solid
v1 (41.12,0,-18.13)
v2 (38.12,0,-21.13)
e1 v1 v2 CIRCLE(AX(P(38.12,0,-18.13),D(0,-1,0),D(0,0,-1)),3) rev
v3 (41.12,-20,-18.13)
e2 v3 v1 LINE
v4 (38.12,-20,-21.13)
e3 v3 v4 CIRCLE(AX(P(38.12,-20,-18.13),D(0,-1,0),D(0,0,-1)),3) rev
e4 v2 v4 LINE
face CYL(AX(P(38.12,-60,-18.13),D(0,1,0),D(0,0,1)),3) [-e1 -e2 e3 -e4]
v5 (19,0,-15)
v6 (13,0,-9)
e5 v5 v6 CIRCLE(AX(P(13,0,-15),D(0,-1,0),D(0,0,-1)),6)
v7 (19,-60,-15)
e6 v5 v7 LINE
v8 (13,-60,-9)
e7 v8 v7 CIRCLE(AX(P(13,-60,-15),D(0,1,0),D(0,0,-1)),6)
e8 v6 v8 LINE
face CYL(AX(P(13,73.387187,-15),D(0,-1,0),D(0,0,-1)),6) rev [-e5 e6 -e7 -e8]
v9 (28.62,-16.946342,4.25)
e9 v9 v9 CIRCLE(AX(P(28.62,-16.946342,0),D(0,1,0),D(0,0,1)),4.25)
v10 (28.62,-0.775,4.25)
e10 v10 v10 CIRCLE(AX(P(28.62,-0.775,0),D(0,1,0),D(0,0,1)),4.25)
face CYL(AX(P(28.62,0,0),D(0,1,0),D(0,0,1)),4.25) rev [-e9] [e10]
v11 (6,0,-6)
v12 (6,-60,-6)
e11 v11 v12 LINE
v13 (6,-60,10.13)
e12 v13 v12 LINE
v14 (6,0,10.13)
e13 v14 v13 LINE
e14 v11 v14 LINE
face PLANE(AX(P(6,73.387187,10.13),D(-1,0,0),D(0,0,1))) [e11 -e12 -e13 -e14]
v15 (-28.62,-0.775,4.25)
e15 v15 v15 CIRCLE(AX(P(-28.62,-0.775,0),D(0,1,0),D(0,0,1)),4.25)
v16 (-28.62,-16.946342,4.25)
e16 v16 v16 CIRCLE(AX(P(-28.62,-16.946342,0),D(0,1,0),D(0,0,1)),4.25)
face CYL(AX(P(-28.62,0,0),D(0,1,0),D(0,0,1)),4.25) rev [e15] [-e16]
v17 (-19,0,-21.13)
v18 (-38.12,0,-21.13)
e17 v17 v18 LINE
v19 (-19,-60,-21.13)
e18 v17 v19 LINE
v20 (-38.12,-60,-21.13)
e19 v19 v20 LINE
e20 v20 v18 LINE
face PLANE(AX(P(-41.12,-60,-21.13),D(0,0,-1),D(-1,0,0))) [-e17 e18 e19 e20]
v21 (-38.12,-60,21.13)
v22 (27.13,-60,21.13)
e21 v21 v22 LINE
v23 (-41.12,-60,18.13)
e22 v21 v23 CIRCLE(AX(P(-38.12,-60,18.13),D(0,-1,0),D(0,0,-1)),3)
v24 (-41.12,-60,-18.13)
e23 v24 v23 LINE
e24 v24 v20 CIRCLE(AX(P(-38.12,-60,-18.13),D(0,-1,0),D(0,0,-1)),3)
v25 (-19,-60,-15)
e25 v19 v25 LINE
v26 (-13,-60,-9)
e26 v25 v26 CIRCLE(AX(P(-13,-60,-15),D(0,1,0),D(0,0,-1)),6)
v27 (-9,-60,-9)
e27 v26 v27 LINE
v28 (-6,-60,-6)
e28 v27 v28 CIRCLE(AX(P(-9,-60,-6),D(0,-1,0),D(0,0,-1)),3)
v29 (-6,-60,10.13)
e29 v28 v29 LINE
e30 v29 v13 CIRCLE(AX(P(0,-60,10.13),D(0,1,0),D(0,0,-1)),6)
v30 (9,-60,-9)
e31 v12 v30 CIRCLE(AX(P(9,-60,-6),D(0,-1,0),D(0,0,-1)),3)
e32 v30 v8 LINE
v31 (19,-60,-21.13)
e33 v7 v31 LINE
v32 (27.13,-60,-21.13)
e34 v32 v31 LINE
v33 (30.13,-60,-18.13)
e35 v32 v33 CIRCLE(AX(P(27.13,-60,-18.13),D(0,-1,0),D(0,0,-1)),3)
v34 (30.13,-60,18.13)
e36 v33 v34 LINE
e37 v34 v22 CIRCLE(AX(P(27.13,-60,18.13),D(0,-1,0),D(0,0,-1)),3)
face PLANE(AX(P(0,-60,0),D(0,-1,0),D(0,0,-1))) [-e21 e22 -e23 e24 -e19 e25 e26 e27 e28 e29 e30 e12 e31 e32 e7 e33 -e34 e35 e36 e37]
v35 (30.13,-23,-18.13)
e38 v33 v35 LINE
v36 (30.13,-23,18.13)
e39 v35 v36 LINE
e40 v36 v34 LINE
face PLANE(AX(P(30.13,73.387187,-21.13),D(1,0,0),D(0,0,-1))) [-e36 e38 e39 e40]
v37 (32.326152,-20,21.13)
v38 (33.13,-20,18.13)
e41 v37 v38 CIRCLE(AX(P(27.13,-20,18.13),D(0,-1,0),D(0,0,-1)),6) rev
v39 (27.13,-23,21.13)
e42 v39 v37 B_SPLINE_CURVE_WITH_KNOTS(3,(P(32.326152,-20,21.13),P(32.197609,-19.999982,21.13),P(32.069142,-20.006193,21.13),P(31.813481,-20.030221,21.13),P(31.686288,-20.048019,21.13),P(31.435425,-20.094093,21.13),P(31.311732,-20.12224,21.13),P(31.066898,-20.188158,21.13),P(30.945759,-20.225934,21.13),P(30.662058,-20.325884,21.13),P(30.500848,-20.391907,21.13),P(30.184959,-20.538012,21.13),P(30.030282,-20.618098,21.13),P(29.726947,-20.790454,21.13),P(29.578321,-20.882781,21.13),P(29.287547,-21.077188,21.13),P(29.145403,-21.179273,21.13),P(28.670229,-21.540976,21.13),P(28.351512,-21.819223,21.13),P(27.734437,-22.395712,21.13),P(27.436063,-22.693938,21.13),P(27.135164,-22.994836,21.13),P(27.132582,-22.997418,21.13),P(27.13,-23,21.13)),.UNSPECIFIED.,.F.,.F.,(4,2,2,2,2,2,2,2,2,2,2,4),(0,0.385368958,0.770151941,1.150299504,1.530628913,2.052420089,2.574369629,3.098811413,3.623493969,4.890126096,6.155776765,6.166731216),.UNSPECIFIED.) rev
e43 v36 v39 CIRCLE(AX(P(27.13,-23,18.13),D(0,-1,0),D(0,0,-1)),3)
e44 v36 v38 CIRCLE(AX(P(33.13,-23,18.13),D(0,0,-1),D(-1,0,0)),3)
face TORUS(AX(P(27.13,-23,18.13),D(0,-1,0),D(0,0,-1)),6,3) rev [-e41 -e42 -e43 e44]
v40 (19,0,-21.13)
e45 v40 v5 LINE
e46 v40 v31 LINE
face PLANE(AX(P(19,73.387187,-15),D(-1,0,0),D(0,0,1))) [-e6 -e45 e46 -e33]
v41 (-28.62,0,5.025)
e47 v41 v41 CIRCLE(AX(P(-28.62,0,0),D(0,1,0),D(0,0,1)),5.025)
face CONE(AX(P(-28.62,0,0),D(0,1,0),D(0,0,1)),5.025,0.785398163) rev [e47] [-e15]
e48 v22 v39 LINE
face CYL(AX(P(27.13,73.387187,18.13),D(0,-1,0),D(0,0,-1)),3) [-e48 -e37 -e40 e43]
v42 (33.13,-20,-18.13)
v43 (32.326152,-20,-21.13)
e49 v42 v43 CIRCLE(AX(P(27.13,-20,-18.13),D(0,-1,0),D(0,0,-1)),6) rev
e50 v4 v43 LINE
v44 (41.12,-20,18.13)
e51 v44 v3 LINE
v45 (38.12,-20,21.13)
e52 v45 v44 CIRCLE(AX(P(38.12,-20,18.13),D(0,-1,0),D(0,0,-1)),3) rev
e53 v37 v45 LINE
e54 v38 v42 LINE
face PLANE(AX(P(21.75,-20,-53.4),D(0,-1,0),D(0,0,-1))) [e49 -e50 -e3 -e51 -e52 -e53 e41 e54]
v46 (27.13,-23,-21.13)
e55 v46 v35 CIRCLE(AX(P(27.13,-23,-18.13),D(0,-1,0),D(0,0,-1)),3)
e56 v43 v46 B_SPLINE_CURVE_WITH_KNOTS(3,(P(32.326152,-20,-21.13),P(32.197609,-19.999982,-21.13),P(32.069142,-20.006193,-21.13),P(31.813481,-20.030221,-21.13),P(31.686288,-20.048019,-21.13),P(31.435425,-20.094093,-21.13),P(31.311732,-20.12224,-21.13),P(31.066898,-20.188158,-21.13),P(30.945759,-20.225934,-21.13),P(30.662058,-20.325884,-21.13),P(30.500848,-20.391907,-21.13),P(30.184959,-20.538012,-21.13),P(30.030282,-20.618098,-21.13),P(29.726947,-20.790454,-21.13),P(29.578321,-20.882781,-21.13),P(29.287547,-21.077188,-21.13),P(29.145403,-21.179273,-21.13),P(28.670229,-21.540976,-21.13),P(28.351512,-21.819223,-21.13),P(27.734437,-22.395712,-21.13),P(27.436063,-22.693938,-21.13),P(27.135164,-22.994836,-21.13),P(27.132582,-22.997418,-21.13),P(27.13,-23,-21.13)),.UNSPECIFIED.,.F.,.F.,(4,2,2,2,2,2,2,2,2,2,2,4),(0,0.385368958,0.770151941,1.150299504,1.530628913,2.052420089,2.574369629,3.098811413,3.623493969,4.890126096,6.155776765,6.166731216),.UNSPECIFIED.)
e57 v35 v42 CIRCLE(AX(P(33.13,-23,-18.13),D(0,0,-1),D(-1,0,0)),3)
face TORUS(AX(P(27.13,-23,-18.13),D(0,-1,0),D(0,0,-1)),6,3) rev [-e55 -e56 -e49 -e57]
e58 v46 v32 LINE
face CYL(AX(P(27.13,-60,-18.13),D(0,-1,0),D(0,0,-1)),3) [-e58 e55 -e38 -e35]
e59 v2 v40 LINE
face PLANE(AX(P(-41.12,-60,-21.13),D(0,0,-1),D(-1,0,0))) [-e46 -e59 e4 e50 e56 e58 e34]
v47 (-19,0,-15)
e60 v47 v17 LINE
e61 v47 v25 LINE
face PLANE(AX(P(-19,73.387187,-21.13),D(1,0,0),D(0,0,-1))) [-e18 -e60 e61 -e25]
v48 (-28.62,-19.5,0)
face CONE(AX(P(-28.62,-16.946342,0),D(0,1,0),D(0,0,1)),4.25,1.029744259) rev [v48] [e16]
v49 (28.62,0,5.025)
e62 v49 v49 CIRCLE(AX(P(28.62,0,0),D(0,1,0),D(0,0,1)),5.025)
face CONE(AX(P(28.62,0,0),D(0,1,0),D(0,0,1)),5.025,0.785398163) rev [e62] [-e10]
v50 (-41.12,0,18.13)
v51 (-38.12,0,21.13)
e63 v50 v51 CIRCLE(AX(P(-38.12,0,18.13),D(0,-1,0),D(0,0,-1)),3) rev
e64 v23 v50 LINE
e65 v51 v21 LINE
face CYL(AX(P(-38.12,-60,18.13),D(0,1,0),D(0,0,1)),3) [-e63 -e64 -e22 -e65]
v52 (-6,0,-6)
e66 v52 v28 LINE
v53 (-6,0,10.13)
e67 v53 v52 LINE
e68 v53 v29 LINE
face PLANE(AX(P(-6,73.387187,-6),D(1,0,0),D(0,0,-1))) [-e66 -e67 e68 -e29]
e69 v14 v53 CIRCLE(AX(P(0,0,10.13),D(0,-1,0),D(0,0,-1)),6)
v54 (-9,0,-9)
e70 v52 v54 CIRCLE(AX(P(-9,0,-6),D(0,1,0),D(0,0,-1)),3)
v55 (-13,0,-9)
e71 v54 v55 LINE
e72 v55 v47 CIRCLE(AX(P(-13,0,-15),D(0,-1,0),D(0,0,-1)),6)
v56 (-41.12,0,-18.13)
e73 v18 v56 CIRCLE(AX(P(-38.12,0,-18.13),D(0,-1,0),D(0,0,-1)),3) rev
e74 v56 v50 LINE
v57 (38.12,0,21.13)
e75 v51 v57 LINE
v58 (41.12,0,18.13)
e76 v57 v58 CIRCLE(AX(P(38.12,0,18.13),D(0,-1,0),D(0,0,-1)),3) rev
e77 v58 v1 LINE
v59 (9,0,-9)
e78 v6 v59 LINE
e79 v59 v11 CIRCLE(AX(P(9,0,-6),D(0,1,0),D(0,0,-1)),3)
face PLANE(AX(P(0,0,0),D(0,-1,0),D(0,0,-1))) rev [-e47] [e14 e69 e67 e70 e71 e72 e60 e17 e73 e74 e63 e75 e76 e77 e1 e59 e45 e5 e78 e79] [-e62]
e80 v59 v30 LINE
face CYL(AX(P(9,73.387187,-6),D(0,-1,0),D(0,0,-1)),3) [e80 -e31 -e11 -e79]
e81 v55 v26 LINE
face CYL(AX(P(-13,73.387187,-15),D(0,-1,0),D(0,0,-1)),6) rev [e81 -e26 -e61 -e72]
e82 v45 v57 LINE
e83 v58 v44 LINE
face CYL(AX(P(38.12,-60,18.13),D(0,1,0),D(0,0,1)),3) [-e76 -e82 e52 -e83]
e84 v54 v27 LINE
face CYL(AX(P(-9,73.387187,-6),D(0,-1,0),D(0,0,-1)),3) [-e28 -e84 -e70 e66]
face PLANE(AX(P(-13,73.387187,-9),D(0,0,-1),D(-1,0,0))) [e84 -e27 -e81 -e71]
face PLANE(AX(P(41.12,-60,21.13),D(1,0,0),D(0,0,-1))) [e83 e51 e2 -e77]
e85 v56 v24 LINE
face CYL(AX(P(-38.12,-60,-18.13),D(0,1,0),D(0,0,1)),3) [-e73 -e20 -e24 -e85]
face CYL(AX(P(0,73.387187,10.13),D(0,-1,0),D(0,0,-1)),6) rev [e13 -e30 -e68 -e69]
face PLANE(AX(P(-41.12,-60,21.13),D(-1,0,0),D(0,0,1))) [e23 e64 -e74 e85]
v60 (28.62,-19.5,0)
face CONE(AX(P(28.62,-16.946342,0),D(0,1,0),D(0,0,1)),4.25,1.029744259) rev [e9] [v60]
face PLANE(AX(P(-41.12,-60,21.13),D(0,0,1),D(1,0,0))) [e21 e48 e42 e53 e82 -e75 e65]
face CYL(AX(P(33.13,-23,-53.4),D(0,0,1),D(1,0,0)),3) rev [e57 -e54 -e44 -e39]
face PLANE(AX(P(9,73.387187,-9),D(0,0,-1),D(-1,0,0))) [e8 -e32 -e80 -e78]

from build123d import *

# Parameters (mm, degrees)
SKETCH2_W                    = 82.24
SKETCH2_H                    = 42.26
BOSS_EXTRUDE1_DEPTH          = 60
FILLET1_R                    = 3
SKETCH5_OUTSIDE_W            = 106.284
SKETCH5_OUTSIDE_H            = 66.304
CUT_EXTRUDE2_DEPTH           = 40
CUT_EXTRUDE3_DEPTH           = 76.745173444
FILLET2_R                    = 3
FILLET3_R                    = 3
M10_TAPPED_HOLE1_D           = 8.5
M10_TAPPED_HOLE1_DEPTH       = 16.946342369
M10_TAPPED_HOLE1_CSINK_D     = 10.05
M10_TAPPED_HOLE1_CSINK_ANGLE = 90
M10_TAPPED_HOLE1_TIP         = 2.553657631


with BuildPart() as part:
    # Sketch2 → Boss-Extrude1 (new body)
    with BuildSketch(Plane(origin=(0, 0, 0), x_dir=(1, 0, 0), z_dir=(0, 1, 0))):
        Rectangle(SKETCH2_W, SKETCH2_H)
    extrude(amount=-BOSS_EXTRUDE1_DEPTH)

    # Fillet1
    fillet1_edges = [part.edges().sort_by_distance(p)[0] for p in [
        (41.12, -30, 21.13),
        (-41.12, -30, 21.13),
        (-41.12, -30, -21.13),
        (41.12, -30, -21.13),
    ]]
    fillet(fillet1_edges, radius=FILLET1_R)

    # Sketch5 outside → Cut-Extrude2 (cut)
    with BuildSketch(Plane.XZ.offset(60)):
        Rectangle(SKETCH5_OUTSIDE_W, SKETCH5_OUTSIDE_H)
        with BuildLine():
            Line((19, -21.13), (30.13, -21.13))
            Line((30.13, -21.13), (30.13, 21.13))
            Line((30.13, 21.13), (-41.12, 21.13))
            Line((-41.12, 21.13), (-41.12, -21.13))
            Line((-41.12, -21.13), (-19, -21.13))
            Line((-19, -21.13), (-19, -15))
            ThreePointArc((-19, -15), (-17.242640687, -10.757359313), (-13, -9))
            Line((-13, -9), (-9, -9))
            ThreePointArc((-9, -9), (-6.878679656, -8.121320344), (-6, -6))
            Line((-6, -6), (-6, 10.13))
            ThreePointArc((-6, 10.13), (0, 16.13), (6, 10.13))
            Line((6, 10.13), (6, -6))
            ThreePointArc((6, -6), (6.878679656, -8.121320344), (9, -9))
            Line((9, -9), (13, -9))
            ThreePointArc((13, -9), (17.242640687, -10.757359313), (19, -15))
            Line((19, -15), (19, -21.13))
        make_face(mode=Mode.SUBTRACT)
    extrude(amount=-CUT_EXTRUDE2_DEPTH, mode=Mode.SUBTRACT)

    # Sketch6 → Cut-Extrude3 (cut, through all)
    with BuildSketch(Plane.XZ.offset(60)):
        with BuildLine():
            Line((-13, -9), (-9, -9))
            ThreePointArc((-9, -9), (-6.878679656, -8.121320344), (-6, -6))
            Line((-6, -6), (-6, 10.13))
            ThreePointArc((-6, 10.13), (0, 16.13), (6, 10.13))
            Line((6, 10.13), (6, -6))
            ThreePointArc((6, -6), (6.878679656, -8.121320344), (9, -9))
            Line((9, -9), (13, -9))
            ThreePointArc((13, -9), (17.242640687, -10.757359313), (19, -15))
            Line((19, -15), (19, -21.13))
            Line((19, -21.13), (-19, -21.13))
            Line((-19, -21.13), (-19, -15))
            ThreePointArc((-19, -15), (-17.242640687, -10.757359313), (-13, -9))
        make_face()
    extrude(amount=-CUT_EXTRUDE3_DEPTH, mode=Mode.SUBTRACT)

    # Fillet2
    fillet2_edges = [part.edges().sort_by_distance(p)[0] for p in [
        (30.13, -40, 21.13),
        (30.13, -40, -21.13),
    ]]
    fillet(fillet2_edges, radius=FILLET2_R)

    # Fillet3
    # the kernel refuses this fillet: 3 mm, written as the material it adds along each edge
    with BuildSketch(Plane(origin=(30.13, -20, -18.13), x_dir=(0, -1, 0), z_dir=(0, 0, 1))) as fillet3_piece_1:
        with BuildLine():
            CenterArc((FILLET3_R, FILLET3_R), FILLET3_R, 180, 90)
            Line((0, FILLET3_R), (0, 0))
            Line((0, 0), (FILLET3_R, 0))
        make_face()
    extrude(amount=36.26)
    with BuildSketch(Plane(origin=(27.13, -20, 18.13), x_dir=(-0.5976672776328266, 0, -0.801744239297649), z_dir=(0.801744239297649, 0, -0.5976672776328266))) as fillet3_piece_2_section:
        with BuildLine():
            CenterArc((3 + FILLET3_R, -FILLET3_R), FILLET3_R, 90, 90)
            Line((3, -FILLET3_R), (3, 0))
            Line((3, 0), (3 + FILLET3_R, 0))
        make_face()
    fillet3_piece_2 = revolve(axis=Axis((27.13, -20, 18.13), (0, 1, 0)), revolution_arc=233.296989237, mode=Mode.PRIVATE)
    fillet3_piece_2 = split(fillet3_piece_2, bisect_by=Plane(origin=(29.379816868, -20.934884818, 21.13), z_dir=(0, 0, -1)), keep=Keep.TOP, mode=Mode.PRIVATE)
    add(fillet3_piece_2)
    with BuildSketch(Plane(origin=(27.13, -20, -18.13), x_dir=(-0.5976672776328287, 0, 0.8017442392976475), z_dir=(0.8017442392976475, 0, 0.5976672776328287))) as fillet3_piece_3_section:
        with BuildLine():
            CenterArc((3 + FILLET3_R, FILLET3_R), FILLET3_R, 180, 90)
            Line((3 + FILLET3_R, 0), (3, 0))
            Line((3, 0), (3, FILLET3_R))
        make_face()
    fillet3_piece_3 = revolve(axis=Axis((27.13, -20, -18.13), (0, -1, 0)), revolution_arc=233.296989237, mode=Mode.PRIVATE)
    fillet3_piece_3 = split(fillet3_piece_3, bisect_by=Plane(origin=(29.379816762, -20.934885263, -21.13), z_dir=(0, 0, 1)), keep=Keep.TOP, mode=Mode.PRIVATE)
    add(fillet3_piece_3)

    # M10 Tapped Hole1
    with Locations(Plane(origin=(0, 0, 0), x_dir=(1, 0, 0), z_dir=(0, 1, 0))):
        with Locations((28.62, 0), (-28.62, 0)):
            CounterSinkHole(M10_TAPPED_HOLE1_D / 2, M10_TAPPED_HOLE1_CSINK_D / 2, depth=M10_TAPPED_HOLE1_DEPTH, counter_sink_angle=M10_TAPPED_HOLE1_CSINK_ANGLE)
            with Locations((0, 0, -(M10_TAPPED_HOLE1_DEPTH + M10_TAPPED_HOLE1_TIP / 2))):  # 118° drill point
                Cone(0, M10_TAPPED_HOLE1_D / 2, M10_TAPPED_HOLE1_TIP, mode=Mode.SUBTRACT)


solid = part.part
